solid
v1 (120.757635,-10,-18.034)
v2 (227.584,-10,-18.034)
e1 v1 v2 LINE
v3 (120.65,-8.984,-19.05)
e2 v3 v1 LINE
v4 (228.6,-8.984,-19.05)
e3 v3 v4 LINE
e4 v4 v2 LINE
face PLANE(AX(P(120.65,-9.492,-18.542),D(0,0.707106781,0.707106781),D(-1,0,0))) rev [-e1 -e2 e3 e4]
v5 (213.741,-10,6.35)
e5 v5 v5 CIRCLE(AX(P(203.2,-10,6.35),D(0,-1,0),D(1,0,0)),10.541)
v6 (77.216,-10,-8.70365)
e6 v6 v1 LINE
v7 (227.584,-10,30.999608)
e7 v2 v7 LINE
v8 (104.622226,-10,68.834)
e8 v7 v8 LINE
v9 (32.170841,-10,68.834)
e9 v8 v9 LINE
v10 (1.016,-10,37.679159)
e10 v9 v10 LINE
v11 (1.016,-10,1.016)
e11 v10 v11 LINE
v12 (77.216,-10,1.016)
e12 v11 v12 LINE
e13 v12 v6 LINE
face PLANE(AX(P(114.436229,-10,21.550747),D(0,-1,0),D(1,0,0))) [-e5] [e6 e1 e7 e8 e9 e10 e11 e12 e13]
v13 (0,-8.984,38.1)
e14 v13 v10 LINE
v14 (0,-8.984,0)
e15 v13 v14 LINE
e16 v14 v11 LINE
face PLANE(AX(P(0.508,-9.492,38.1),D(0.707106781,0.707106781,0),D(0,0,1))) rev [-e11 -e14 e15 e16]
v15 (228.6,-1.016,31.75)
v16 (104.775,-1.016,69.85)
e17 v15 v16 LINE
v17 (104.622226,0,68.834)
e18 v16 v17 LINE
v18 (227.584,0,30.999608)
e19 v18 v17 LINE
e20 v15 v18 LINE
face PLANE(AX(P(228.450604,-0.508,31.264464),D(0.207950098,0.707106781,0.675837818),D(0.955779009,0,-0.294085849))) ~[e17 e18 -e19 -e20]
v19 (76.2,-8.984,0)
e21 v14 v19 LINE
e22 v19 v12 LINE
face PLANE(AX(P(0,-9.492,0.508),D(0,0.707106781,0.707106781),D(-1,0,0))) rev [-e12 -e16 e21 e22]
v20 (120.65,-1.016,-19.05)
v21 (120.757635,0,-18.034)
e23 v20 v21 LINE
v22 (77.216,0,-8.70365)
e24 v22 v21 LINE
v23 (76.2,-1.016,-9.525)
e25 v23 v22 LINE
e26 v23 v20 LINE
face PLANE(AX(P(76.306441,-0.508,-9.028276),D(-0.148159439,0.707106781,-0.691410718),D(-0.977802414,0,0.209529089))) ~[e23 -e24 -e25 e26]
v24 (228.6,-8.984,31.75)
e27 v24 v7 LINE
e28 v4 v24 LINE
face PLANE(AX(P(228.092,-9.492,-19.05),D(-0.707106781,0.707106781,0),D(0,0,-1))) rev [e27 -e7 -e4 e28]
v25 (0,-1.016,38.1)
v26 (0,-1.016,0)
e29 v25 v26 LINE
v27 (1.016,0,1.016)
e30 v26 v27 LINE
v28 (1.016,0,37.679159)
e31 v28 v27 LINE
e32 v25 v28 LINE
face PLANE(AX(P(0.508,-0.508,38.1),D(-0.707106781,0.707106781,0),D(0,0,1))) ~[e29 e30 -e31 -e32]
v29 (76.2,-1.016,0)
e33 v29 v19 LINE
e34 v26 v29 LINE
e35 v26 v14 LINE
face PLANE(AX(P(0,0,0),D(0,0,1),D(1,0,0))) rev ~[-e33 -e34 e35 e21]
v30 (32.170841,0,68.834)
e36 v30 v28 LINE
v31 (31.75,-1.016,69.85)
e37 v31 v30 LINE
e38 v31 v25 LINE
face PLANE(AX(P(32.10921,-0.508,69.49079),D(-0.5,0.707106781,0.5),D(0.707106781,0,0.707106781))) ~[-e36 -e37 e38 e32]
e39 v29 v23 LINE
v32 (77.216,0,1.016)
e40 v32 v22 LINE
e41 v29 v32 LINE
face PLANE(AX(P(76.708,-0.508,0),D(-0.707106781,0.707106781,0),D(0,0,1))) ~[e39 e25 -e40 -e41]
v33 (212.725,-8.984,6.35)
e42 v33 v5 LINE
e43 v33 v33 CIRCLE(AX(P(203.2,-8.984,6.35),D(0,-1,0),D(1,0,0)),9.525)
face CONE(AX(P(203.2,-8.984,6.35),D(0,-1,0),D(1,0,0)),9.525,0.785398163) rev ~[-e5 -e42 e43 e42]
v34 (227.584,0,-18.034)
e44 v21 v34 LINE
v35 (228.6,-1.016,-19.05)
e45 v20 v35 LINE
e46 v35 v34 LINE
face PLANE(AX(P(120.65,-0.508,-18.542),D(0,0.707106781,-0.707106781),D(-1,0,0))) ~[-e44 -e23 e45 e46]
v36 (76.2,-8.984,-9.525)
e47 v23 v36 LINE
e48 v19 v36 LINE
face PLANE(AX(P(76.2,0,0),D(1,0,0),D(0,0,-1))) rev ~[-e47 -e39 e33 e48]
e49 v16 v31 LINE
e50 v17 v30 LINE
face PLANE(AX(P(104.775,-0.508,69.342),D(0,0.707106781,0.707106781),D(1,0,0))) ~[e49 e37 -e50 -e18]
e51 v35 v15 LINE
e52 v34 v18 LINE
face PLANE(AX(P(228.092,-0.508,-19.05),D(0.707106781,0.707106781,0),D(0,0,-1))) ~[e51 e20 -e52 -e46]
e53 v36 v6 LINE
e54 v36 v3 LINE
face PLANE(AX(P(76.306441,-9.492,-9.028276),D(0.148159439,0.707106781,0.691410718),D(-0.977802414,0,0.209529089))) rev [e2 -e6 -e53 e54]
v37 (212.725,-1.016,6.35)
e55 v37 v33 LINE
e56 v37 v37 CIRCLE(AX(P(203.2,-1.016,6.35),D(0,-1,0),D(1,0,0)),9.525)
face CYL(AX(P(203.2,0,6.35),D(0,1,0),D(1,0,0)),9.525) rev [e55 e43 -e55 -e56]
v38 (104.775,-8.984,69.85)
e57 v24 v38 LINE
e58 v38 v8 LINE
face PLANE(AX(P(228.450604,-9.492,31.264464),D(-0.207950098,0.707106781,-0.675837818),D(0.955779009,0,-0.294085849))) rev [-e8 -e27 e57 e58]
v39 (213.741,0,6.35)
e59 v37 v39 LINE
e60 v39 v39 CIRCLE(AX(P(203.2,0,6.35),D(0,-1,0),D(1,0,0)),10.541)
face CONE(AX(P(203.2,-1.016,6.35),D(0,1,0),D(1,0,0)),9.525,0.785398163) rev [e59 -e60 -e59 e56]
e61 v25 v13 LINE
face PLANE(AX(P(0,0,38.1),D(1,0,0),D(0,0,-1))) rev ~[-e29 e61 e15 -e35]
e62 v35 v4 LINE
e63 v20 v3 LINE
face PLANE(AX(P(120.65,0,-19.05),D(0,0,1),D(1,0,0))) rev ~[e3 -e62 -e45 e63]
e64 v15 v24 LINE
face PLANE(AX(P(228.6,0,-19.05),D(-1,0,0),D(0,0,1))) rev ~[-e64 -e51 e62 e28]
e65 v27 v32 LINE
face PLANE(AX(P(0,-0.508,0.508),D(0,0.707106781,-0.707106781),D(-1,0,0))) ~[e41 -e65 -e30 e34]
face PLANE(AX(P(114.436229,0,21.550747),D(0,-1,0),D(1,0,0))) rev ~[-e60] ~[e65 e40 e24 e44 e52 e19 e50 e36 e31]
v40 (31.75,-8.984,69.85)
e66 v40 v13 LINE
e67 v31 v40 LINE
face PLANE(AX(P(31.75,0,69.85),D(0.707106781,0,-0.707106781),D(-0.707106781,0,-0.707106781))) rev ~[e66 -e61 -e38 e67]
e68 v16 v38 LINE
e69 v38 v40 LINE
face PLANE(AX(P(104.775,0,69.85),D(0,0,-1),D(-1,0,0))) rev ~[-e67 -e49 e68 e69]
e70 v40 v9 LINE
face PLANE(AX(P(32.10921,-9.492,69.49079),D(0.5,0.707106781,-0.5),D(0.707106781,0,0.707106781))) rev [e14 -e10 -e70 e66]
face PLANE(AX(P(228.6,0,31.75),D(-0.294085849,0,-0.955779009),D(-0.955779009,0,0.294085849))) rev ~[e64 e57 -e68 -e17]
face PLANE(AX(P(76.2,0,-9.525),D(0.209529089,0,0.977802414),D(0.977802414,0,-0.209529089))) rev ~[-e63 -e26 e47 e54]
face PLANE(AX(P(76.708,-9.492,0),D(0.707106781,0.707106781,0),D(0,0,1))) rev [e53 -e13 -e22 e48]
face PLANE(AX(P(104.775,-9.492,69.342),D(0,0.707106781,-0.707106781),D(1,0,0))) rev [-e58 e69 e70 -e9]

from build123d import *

# Parameters (mm, degrees)
F0_R     = 9.525
F1_DEPTH = 10
F2_SIZE  = 1.016


# Not quite as in the source:
# - a feature names something its author has since deleted; it is built from what else it names


with BuildPart() as f1:
    # F0 (on Front) → F1 (new body)
    with BuildSketch(Plane.XZ):
        Polygon((0, 38.1), (0, 0), (76.2, 0), (76.2, -9.525), (120.65, -19.05), (228.6, -19.05), (228.6, 31.75), (104.775, 69.85), (31.75, 69.85), align=None)
        with Locations((203.2, 6.35)):
            Circle(F0_R, mode=Mode.SUBTRACT)
    extrude(amount=F1_DEPTH)

    # F2
    f2_edges = [f1.edges().sort_by_distance(p)[0] for p in [
        (15.875, -10, 53.975),
        (0, -10, 19.05),
        (38.1, -10, 0),
        (76.2, -10, -4.7625),
        (98.425, -10, -14.2875),
        (174.625, -10, -19.05),
        (228.6, -10, 6.35),
        (166.6875, -10, 50.8),
        (68.2625, -10, 69.85),
        (193.675, -10, 6.35),
        (15.875, 0, 53.975),
        (0, 0, 19.05),
        (38.1, 0, 0),
        (76.2, 0, -4.7625),
        (98.425, 0, -14.2875),
        (174.625, 0, -19.05),
        (228.6, 0, 6.35),
        (166.6875, 0, 50.8),
        (68.2625, 0, 69.85),
        (193.675, 0, 6.35),
    ]]
    chamfer(f2_edges, length=F2_SIZE)


solid = f1.part
